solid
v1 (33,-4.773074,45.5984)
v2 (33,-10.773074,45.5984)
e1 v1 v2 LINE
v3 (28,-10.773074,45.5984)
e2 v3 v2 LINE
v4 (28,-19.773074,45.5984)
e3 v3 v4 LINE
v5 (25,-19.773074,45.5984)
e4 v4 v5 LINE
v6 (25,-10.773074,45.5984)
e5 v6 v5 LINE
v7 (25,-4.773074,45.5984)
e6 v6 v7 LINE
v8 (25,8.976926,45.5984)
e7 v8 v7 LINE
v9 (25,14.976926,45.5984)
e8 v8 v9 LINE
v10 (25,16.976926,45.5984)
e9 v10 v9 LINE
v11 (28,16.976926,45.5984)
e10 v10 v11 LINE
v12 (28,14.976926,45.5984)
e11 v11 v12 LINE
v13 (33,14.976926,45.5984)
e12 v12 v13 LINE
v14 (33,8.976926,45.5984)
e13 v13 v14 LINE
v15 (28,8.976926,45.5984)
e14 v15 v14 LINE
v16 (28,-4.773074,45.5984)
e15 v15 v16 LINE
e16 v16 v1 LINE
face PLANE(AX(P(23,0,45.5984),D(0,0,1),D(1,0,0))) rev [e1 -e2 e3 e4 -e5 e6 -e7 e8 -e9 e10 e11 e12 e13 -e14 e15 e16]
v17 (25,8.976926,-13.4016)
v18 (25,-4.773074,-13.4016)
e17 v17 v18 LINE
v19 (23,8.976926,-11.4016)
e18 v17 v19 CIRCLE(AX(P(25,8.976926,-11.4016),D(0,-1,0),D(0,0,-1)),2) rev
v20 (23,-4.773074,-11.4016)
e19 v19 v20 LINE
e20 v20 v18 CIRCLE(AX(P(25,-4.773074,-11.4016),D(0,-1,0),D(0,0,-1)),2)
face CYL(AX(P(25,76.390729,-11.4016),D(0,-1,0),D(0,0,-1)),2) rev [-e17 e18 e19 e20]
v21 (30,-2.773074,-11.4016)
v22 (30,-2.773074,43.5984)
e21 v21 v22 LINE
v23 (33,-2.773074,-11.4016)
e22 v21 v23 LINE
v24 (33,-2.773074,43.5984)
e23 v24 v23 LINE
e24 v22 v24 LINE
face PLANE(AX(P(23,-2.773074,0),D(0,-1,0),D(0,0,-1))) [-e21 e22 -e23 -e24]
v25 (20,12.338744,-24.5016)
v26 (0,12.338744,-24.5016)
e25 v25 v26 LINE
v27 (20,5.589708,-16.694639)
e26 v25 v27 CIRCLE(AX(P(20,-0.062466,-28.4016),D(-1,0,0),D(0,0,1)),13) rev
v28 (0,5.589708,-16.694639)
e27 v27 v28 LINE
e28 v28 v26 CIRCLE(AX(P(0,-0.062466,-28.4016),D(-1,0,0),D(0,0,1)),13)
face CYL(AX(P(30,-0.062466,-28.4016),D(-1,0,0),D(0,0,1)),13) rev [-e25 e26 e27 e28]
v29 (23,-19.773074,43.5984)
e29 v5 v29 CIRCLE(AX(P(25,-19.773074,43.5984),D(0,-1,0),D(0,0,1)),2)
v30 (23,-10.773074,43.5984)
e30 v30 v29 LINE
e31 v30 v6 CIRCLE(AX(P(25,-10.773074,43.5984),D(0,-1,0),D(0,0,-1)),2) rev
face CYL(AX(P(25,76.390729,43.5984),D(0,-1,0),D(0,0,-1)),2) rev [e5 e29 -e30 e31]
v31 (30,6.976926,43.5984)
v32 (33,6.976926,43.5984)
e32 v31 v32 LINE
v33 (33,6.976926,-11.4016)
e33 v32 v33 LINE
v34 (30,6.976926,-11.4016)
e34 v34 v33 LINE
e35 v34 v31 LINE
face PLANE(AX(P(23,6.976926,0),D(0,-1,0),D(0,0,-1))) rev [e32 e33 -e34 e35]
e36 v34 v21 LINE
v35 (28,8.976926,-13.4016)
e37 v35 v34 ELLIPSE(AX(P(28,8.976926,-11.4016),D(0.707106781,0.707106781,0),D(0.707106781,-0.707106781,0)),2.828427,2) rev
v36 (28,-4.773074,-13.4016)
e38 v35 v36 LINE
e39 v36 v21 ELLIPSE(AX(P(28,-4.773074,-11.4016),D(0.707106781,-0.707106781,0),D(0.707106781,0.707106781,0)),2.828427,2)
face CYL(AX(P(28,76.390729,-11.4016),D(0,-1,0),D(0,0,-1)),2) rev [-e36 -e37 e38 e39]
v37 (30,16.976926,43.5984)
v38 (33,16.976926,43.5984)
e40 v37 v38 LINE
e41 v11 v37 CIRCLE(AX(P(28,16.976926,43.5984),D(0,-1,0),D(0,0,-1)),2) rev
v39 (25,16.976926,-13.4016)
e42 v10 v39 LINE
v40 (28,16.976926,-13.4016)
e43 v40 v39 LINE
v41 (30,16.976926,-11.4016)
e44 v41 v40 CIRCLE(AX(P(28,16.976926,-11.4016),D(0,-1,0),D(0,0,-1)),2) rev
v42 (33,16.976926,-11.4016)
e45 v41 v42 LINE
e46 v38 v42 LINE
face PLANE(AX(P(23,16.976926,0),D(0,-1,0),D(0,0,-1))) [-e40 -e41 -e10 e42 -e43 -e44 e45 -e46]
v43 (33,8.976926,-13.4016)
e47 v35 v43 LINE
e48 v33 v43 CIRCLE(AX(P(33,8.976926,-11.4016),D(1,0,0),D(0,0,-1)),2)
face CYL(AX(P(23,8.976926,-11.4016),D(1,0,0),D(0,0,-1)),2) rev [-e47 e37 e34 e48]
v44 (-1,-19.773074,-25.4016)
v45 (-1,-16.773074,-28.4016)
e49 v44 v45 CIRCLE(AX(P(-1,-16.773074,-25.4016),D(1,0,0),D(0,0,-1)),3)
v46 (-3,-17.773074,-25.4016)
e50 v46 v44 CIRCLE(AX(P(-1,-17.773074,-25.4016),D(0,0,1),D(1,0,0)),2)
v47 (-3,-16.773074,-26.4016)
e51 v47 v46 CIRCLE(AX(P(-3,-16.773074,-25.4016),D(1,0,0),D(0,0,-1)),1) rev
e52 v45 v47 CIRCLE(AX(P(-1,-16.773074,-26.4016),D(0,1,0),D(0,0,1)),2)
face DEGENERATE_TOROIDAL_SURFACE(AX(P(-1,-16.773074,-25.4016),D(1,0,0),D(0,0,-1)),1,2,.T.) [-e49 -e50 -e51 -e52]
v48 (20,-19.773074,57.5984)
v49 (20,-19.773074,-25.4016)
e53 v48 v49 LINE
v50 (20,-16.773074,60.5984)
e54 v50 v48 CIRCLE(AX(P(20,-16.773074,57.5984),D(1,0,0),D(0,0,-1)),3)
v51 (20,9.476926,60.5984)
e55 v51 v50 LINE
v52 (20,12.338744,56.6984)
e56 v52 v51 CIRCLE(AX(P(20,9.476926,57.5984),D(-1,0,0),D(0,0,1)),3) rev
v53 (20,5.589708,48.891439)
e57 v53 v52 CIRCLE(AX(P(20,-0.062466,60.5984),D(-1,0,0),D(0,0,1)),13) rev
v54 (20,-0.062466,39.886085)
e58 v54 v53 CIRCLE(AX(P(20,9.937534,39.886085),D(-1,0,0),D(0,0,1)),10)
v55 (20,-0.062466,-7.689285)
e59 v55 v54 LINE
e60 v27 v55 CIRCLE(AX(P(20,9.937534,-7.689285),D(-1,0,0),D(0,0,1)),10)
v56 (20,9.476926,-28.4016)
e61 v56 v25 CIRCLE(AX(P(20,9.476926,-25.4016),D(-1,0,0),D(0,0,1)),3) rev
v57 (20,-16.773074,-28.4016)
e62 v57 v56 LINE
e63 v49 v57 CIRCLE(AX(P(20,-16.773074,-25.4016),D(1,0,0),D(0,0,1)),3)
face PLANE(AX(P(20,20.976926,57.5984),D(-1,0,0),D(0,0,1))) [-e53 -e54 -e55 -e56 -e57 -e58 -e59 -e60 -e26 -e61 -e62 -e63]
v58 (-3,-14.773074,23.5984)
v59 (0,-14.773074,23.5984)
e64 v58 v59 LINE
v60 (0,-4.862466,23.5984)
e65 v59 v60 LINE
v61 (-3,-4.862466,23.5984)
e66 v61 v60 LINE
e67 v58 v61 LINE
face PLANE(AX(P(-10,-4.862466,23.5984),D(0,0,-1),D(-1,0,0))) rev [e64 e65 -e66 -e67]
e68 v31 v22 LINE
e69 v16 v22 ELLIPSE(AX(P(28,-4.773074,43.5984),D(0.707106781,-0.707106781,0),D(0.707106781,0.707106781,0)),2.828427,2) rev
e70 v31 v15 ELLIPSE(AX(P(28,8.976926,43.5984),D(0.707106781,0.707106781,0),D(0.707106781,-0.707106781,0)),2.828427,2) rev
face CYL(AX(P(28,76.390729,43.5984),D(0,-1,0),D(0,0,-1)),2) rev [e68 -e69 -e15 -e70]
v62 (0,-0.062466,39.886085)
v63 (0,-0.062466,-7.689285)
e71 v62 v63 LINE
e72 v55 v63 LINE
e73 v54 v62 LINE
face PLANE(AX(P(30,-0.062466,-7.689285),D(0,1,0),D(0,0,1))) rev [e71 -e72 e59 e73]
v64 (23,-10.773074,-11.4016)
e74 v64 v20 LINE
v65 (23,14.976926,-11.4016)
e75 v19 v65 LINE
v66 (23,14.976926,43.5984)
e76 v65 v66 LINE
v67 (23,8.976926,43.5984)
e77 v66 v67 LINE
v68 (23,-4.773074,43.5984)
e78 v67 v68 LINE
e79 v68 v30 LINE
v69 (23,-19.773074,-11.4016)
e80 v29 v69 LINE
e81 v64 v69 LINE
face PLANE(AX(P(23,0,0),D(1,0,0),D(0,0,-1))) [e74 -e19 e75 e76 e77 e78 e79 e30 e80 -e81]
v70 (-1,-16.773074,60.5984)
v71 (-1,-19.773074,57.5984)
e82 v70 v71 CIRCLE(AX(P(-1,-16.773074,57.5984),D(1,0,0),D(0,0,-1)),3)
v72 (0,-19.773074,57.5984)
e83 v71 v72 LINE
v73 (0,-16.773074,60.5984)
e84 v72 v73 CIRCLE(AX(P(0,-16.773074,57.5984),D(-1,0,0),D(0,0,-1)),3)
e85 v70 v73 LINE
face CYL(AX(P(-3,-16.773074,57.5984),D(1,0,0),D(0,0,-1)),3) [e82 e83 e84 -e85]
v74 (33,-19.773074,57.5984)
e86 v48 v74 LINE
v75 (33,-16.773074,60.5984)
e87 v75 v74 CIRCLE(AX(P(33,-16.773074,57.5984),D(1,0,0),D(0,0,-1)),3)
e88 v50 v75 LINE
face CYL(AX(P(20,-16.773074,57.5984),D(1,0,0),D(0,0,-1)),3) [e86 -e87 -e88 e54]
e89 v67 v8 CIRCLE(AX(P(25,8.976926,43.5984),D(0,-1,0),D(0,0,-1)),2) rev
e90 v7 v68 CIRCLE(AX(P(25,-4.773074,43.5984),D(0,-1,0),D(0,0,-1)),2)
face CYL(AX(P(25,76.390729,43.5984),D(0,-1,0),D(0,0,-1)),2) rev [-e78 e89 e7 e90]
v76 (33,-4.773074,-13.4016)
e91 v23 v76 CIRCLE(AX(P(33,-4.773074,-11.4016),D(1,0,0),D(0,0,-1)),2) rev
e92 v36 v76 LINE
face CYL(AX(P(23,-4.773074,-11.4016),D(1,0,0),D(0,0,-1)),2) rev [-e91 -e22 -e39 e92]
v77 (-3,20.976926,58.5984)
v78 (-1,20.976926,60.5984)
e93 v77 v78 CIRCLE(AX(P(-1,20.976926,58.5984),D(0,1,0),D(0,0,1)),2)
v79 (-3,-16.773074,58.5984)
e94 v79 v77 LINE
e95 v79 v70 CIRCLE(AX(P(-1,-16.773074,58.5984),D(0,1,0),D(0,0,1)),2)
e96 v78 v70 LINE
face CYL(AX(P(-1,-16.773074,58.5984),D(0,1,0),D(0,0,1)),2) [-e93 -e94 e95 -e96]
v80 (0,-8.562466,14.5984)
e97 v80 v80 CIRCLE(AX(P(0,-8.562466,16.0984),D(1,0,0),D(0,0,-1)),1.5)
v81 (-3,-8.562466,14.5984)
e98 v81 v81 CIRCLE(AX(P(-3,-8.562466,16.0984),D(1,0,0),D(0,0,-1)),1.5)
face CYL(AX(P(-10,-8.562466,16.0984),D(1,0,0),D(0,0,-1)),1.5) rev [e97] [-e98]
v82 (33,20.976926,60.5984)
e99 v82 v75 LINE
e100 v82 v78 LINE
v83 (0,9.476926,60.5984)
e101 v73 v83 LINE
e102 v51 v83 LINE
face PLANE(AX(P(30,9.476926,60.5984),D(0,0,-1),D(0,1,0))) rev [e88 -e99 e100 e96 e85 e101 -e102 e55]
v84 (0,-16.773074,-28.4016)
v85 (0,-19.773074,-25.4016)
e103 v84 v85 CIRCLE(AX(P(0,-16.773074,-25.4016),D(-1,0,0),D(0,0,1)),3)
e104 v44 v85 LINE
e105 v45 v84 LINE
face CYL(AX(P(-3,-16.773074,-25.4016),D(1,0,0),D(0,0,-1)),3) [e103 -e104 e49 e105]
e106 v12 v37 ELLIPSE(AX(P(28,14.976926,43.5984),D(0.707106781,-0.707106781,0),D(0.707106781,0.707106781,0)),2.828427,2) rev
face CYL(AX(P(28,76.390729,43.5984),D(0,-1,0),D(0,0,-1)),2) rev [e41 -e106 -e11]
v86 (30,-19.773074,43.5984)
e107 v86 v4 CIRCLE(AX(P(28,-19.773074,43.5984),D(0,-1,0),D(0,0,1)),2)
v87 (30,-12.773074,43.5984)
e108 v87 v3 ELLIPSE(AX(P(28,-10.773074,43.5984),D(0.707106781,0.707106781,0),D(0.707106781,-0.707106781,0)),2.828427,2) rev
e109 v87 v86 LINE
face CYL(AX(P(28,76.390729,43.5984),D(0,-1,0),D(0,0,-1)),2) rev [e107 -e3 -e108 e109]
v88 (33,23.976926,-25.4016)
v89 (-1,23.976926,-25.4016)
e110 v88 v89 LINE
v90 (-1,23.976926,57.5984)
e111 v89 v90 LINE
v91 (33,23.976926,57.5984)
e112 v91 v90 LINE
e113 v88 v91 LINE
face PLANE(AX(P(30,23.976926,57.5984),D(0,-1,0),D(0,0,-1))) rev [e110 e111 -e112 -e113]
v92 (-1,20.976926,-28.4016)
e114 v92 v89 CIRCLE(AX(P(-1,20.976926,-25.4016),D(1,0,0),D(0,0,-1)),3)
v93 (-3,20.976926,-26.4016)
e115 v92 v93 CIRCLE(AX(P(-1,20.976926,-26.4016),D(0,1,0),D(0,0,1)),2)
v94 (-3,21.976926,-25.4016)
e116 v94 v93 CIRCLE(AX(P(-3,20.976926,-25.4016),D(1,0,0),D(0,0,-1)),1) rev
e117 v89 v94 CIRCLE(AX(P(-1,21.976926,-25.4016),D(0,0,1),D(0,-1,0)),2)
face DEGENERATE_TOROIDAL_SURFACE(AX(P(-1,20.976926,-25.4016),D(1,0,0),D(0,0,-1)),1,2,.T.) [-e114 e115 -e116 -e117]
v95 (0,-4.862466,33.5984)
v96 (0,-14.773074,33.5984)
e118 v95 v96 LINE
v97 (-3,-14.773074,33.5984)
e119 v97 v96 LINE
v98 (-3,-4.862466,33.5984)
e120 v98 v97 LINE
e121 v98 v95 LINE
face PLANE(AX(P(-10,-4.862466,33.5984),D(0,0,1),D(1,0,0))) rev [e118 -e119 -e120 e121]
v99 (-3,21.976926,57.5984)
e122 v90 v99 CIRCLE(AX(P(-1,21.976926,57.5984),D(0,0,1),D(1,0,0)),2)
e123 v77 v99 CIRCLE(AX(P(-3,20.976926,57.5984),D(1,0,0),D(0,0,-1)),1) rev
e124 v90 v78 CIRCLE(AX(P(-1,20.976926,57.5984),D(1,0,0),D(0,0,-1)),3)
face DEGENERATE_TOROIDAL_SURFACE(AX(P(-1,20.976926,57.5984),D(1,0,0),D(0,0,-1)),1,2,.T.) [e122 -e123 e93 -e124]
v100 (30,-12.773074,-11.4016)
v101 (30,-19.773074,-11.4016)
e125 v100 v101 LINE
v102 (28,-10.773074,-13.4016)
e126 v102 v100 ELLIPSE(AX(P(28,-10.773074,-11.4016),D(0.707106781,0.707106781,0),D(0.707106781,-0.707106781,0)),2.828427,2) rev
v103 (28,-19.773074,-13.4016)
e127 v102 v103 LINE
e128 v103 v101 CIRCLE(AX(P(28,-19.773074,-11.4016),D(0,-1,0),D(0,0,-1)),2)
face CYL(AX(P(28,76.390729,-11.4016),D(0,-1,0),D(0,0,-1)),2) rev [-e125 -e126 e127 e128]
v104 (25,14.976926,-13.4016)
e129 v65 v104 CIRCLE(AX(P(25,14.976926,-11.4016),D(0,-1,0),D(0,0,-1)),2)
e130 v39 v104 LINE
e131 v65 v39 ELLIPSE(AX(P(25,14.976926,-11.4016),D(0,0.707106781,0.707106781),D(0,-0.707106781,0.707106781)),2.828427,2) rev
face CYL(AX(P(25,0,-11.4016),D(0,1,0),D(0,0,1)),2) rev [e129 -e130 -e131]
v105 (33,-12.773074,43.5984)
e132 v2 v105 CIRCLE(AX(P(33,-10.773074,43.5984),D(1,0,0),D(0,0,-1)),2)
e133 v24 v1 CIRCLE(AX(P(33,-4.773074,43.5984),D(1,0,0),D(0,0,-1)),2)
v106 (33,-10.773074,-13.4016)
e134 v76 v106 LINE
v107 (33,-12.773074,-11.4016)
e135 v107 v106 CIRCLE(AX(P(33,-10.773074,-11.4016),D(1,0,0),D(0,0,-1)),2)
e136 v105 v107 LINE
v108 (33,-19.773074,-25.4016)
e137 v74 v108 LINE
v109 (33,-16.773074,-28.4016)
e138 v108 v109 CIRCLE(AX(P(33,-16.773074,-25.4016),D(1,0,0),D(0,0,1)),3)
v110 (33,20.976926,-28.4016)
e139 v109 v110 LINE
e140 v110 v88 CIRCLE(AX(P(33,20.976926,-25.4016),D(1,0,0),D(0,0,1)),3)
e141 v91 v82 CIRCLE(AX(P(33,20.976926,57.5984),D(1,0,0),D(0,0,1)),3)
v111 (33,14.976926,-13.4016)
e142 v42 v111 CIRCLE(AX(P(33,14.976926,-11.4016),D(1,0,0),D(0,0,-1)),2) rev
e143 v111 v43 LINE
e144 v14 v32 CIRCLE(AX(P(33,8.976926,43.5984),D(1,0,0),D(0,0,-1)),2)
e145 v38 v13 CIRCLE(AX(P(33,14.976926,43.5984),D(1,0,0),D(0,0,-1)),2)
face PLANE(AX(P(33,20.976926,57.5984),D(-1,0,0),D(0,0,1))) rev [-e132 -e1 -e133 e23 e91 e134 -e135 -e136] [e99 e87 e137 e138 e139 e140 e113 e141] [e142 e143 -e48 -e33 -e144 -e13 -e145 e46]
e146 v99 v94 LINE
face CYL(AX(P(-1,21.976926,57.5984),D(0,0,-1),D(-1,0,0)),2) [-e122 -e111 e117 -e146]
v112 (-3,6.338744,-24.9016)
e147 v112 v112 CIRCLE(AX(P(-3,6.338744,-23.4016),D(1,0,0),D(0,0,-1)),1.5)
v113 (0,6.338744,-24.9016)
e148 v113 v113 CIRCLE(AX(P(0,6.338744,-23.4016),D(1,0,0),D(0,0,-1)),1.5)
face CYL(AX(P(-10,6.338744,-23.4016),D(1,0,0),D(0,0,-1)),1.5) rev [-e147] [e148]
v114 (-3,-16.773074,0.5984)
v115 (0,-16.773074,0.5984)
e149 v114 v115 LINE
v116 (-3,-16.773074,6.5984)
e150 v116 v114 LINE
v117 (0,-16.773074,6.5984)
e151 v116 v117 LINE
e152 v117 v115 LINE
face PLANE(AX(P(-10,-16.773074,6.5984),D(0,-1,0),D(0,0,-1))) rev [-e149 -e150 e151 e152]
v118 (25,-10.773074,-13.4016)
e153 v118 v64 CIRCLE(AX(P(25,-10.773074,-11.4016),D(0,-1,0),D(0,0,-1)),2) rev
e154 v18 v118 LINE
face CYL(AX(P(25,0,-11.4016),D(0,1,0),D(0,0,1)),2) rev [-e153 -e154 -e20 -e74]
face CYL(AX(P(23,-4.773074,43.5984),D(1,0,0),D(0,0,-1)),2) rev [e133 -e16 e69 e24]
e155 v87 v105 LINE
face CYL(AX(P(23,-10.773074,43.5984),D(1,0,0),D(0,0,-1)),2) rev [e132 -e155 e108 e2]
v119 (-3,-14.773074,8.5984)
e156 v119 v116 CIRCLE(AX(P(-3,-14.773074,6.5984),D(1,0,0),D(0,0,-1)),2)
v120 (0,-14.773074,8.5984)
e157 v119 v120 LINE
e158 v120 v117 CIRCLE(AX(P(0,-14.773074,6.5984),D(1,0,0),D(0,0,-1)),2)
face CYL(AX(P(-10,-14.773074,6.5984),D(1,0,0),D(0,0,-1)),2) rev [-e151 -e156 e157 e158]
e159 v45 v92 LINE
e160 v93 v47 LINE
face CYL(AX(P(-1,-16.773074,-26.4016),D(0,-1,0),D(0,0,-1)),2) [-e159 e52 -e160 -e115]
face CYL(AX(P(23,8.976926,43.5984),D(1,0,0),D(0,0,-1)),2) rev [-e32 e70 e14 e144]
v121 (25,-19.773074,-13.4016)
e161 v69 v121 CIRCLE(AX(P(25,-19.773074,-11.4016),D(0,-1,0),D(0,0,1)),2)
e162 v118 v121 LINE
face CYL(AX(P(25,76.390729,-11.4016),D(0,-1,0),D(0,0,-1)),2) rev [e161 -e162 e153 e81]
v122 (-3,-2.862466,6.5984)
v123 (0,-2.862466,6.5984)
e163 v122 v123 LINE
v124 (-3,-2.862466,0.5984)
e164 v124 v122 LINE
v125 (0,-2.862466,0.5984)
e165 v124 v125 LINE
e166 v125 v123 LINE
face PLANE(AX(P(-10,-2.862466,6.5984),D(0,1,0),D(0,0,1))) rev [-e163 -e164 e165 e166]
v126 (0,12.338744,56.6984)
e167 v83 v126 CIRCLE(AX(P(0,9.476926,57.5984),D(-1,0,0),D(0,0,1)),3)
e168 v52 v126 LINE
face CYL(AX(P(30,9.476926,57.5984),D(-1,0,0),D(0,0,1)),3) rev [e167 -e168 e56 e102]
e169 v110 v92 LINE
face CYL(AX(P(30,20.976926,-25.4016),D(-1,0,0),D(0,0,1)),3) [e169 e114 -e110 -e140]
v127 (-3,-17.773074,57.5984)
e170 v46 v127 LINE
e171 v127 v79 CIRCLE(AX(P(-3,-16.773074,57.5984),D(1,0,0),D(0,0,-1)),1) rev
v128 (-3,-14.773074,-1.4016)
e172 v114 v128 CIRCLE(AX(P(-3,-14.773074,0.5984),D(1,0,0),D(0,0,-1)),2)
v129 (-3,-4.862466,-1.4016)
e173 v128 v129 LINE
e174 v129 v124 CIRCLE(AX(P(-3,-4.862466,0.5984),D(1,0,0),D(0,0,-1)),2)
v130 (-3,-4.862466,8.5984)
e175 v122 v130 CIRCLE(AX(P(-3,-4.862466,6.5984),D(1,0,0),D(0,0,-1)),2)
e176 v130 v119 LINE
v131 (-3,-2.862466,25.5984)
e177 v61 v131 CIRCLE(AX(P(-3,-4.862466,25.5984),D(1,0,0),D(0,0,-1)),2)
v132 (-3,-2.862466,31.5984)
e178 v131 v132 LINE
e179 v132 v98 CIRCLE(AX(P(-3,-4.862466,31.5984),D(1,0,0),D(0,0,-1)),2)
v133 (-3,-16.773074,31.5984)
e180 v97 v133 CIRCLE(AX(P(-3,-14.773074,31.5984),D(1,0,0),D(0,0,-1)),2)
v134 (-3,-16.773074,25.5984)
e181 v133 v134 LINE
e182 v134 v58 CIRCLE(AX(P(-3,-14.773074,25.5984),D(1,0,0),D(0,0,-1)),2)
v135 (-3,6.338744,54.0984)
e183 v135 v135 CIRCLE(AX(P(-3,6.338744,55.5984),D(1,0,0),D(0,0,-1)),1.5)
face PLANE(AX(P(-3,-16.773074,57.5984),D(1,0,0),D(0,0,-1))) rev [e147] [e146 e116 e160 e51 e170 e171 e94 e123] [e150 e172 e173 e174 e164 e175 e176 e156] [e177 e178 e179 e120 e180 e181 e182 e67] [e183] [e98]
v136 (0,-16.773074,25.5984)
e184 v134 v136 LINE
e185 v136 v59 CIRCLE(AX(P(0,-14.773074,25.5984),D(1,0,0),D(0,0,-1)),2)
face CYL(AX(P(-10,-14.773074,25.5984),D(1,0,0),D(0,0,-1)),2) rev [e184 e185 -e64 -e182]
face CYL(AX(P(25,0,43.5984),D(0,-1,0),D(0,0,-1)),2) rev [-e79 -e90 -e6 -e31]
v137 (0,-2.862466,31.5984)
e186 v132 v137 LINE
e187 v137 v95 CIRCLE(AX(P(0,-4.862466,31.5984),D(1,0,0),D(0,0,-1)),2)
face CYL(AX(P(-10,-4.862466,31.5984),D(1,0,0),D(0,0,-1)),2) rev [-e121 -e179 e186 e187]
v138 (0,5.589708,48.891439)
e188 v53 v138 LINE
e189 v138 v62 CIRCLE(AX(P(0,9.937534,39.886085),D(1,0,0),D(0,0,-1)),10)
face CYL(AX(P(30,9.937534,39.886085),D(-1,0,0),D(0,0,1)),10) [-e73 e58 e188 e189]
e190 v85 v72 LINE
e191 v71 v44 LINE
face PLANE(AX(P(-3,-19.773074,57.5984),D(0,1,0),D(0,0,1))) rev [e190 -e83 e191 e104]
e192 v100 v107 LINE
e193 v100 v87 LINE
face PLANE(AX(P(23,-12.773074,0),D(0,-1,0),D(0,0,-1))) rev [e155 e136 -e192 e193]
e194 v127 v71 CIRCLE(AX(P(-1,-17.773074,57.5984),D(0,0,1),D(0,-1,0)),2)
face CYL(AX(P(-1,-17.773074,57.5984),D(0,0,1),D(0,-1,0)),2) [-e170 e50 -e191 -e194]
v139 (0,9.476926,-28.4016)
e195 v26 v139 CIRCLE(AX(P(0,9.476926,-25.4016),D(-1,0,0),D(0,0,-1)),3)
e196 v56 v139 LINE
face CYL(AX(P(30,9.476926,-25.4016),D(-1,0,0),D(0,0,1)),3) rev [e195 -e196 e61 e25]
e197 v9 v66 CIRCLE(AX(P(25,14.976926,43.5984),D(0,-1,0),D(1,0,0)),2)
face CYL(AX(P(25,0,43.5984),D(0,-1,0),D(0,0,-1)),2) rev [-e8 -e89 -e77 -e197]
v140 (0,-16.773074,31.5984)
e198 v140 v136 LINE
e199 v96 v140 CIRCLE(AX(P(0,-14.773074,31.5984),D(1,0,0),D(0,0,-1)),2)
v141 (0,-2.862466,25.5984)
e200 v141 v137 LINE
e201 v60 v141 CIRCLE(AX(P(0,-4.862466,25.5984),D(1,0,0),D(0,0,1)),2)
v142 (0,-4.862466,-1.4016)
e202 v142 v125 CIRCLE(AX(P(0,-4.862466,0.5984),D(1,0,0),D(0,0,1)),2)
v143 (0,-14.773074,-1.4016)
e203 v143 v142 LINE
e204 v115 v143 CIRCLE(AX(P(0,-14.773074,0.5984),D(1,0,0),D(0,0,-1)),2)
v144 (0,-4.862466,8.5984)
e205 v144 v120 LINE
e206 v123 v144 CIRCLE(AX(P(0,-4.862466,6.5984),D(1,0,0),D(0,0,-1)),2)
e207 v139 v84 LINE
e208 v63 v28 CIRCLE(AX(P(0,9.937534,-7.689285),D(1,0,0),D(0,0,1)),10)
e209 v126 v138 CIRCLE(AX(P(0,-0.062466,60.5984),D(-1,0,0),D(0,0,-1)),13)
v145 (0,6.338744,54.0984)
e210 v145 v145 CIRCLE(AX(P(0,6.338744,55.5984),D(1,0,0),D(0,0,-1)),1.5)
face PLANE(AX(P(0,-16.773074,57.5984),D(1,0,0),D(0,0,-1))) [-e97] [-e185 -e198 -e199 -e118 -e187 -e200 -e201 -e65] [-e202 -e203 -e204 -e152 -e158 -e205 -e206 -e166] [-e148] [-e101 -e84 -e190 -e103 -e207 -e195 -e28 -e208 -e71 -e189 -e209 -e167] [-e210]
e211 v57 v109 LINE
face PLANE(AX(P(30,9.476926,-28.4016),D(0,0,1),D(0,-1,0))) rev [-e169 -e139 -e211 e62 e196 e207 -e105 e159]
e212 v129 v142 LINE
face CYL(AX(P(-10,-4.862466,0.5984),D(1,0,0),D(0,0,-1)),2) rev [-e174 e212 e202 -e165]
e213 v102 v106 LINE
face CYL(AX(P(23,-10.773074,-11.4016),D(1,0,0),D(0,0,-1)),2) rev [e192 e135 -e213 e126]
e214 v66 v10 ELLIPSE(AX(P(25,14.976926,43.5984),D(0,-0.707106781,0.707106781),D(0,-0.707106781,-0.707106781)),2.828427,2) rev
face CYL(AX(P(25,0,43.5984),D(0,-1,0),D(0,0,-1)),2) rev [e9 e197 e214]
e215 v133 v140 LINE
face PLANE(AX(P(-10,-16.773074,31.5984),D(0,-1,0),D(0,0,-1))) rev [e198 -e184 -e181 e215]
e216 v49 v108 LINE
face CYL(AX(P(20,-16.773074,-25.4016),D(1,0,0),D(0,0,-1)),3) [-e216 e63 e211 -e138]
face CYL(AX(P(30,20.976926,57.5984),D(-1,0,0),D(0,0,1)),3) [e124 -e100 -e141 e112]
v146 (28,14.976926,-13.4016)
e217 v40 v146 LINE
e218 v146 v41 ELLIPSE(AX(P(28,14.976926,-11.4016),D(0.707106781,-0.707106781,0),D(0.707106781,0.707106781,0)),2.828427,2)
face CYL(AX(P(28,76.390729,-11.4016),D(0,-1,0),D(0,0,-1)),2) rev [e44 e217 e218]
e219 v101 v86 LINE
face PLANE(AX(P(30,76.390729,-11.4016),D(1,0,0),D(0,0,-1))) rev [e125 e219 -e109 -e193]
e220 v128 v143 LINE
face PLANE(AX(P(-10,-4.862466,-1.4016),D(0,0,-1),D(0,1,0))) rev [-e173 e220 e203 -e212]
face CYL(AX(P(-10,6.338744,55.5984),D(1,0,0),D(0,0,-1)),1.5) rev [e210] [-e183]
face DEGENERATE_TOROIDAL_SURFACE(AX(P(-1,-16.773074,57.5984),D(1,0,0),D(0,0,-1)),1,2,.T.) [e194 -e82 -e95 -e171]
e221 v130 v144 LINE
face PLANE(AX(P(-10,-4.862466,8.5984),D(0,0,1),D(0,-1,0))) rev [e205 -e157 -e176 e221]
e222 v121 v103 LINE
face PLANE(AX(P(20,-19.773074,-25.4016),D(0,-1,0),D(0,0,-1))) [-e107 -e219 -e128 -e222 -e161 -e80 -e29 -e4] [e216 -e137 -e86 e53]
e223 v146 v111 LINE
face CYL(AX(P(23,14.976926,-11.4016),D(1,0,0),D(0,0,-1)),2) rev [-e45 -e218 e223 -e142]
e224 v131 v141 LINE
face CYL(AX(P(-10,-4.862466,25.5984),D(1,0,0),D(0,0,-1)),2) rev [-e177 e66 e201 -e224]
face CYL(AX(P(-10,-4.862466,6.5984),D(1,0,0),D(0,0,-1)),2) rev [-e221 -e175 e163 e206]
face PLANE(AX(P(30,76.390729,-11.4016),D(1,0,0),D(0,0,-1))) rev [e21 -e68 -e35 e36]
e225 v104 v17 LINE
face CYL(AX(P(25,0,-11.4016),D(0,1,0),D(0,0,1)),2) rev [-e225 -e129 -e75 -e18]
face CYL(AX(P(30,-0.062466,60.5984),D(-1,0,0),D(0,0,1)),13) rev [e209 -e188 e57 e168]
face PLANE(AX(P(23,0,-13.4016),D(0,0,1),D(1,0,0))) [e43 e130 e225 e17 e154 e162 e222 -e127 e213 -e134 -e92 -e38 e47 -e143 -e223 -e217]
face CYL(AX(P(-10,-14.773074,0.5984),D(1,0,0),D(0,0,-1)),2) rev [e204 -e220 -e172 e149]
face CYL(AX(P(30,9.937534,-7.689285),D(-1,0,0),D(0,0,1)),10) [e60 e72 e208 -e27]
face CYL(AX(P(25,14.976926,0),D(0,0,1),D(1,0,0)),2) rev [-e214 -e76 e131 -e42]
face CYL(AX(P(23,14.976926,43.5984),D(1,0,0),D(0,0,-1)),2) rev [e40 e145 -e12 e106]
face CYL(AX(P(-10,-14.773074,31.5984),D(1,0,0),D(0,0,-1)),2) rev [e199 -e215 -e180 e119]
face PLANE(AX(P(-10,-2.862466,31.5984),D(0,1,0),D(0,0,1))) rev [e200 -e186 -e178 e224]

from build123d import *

# Parameters (mm, degrees)
RESSALTO_EXTRUS_O2_DEPTH      = 30
RESSALTO_EXTRUS_O3_START      = 3
RESSALTO_EXTRUS_O3_DEPTH      = 3
RESSALTO_EXTRUS_O4_DEPTH      = 3
RESSALTO_EXTRUS_O4_DEPTH_BACK = 10
CORTE_EXTRUS_O1_DEPTH         = 10
CORTE_EXTRUS_O2_REACH         = 83.702
FILETE1_START                 = -19.773073923
FILETE1_DEPTH                 = 36.75
FILETE1_START_2               = -13.40159992
FILETE1_2_DEPTH               = 59
ESBO_O10_R                    = 1.5
CORTE_EXTRUS_O3_DEPTH         = 10
CORTE_EXTRUS_O4_DEPTH         = 10
FILETE2_R                     = 2


with BuildPart() as part:
    # Esboço2 → Ressalto-extrusão2 (new body)
    with BuildSketch(Plane(origin=(0, 0, 0), x_dir=(0, 0, -1), z_dir=(1, 0, 0))):
        with BuildLine():
            Line((2.90159992, -0.062465938), (-35.09840008, -0.062465938))
            Line((-35.09840008, -0.062465938), (-39.886084903, -0.062465938))
            ThreePointArc((-39.886084903, -0.062465938), (-45.202180234, 1.467638524), (-48.891439328, 5.589707975))
            ThreePointArc((-48.891439328, 5.589707975), (-52.096536948, 9.772081499), (-56.69840008, 12.338743681))
            ThreePointArc((-56.69840008, 12.338743681), (-59.373224015, 11.895603401), (-60.59840008, 9.476926077))
            Line((-60.59840008, 9.476926077), (-60.59840008, 20.976926077))
            ThreePointArc((-60.59840008, 20.976926077), (-59.719720424, 23.09824642), (-57.59840008, 23.976926077))
            Line((-57.59840008, 23.976926077), (25.40159992, 23.976926077))
            ThreePointArc((25.40159992, 23.976926077), (27.522920263, 23.09824642), (28.40159992, 20.976926077))
            Line((28.40159992, 20.976926077), (28.40159992, 9.476926077))
            ThreePointArc((28.40159992, 9.476926077), (27.176423855, 11.895603401), (24.50159992, 12.338743681))
            ThreePointArc((24.50159992, 12.338743681), (19.899736788, 9.772081499), (16.694639168, 5.589707975))
            ThreePointArc((16.694639168, 5.589707975), (13.005380073, 1.467638524), (7.689284743, -0.062465938))
            Line((7.689284743, -0.062465938), (2.90159992, -0.062465938))
        make_face()
    extrude(amount=RESSALTO_EXTRUS_O2_DEPTH)

    # Esboço3 → Ressalto-extrusão3 (add)
    with BuildSketch(Plane.ZY.offset(RESSALTO_EXTRUS_O3_START)):
        with BuildLine():
            Line((60.59840008, 15.226926077), (60.59840008, 20.976926077))
            ThreePointArc((60.59840008, 20.976926077), (59.719720424, 23.09824642), (57.59840008, 23.976926077))
            Line((57.59840008, 23.976926077), (16.09840008, 23.976926077))
            Line((16.09840008, 23.976926077), (-25.40159992, 23.976926077))
            ThreePointArc((-25.40159992, 23.976926077), (-27.522920263, 23.09824642), (-28.40159992, 20.976926077))
            Line((-28.40159992, 20.976926077), (-28.40159992, 15.226926077))
            Line((-28.40159992, 15.226926077), (-28.40159992, -16.773073923))
            ThreePointArc((-28.40159992, -16.773073923), (-27.522920263, -18.894394267), (-25.40159992, -19.773073923))
            Line((-25.40159992, -19.773073923), (57.59840008, -19.773073923))
            ThreePointArc((57.59840008, -19.773073923), (59.719720424, -18.894394267), (60.59840008, -16.773073923))
            Line((60.59840008, -16.773073923), (60.59840008, 15.226926077))
        make_face()
    extrude(amount=-RESSALTO_EXTRUS_O3_DEPTH)

    # Esboço4 → Ressalto-extrusão4 (add, two sides: drawn at the far end of the back side and taken through both)
    with BuildSketch(Plane(origin=(30, 0, 0), x_dir=(0, 0, -1), z_dir=(1, 0, 0)).offset(-RESSALTO_EXTRUS_O4_DEPTH_BACK)):
        with BuildLine():
            Line((-16.09840008, 23.976926077), (25.40159992, 23.976926077))
            ThreePointArc((25.40159992, 23.976926077), (27.522920263, 23.09824642), (28.40159992, 20.976926077))
            Line((28.40159992, 20.976926077), (28.40159992, 15.226926077))
            Line((28.40159992, 15.226926077), (28.40159992, -16.773073923))
            ThreePointArc((28.40159992, -16.773073923), (27.522920263, -18.894394267), (25.40159992, -19.773073923))
            Line((25.40159992, -19.773073923), (-57.59840008, -19.773073923))
            ThreePointArc((-57.59840008, -19.773073923), (-59.719720424, -18.894394267), (-60.59840008, -16.773073923))
            Line((-60.59840008, -16.773073923), (-60.59840008, 15.226926077))
            Line((-60.59840008, 15.226926077), (-60.59840008, 20.976926077))
            ThreePointArc((-60.59840008, 20.976926077), (-59.719720424, 23.09824642), (-57.59840008, 23.976926077))
            Line((-57.59840008, 23.976926077), (-16.09840008, 23.976926077))
        make_face()
    extrude(amount=RESSALTO_EXTRUS_O4_DEPTH + RESSALTO_EXTRUS_O4_DEPTH_BACK)

    # Esboço8 → Corte-extrusão1 (cut)
    with BuildSketch(Plane(origin=(33, 0, 0), x_dir=(0, 0, -1), z_dir=(1, 0, 0))):
        with BuildLine():
            Line((-43.59840008, -2.773073923), (11.40159992, -2.773073923))
            ThreePointArc((11.40159992, -2.773073923), (12.815813482, -3.358860361), (13.40159992, -4.773073923))
            Line((13.40159992, -4.773073923), (13.40159992, -10.773073923))
            ThreePointArc((13.40159992, -10.773073923), (12.815813482, -12.187287486), (11.40159992, -12.773073923))
            Line((11.40159992, -12.773073923), (-43.59840008, -12.773073923))
            ThreePointArc((-43.59840008, -12.773073923), (-45.012613643, -12.187287486), (-45.59840008, -10.773073923))
            Line((-45.59840008, -10.773073923), (-45.59840008, -4.773073923))
            ThreePointArc((-45.59840008, -4.773073923), (-45.012613643, -3.358860361), (-43.59840008, -2.773073923))
        make_face()
        with BuildLine():
            Line((-43.59840008, 6.976926077), (11.40159992, 6.976926077))
            ThreePointArc((11.40159992, 6.976926077), (12.815813482, 7.562712514), (13.40159992, 8.976926077))
            Line((13.40159992, 8.976926077), (13.40159992, 14.976926077))
            ThreePointArc((13.40159992, 14.976926077), (12.815813482, 16.391139639), (11.40159992, 16.976926077))
            Line((11.40159992, 16.976926077), (-43.59840008, 16.976926077))
            ThreePointArc((-43.59840008, 16.976926077), (-45.012613643, 16.391139639), (-45.59840008, 14.976926077))
            Line((-45.59840008, 14.976926077), (-45.59840008, 8.976926077))
            ThreePointArc((-45.59840008, 8.976926077), (-45.012613643, 7.562712514), (-43.59840008, 6.976926077))
        make_face()
    extrude(amount=-CORTE_EXTRUS_O1_DEPTH, mode=Mode.SUBTRACT)

    # Corte-extrusão2: up to this face of the body (flat: up to its plane)
    corte_extrus_o2_end = Plane(part.part.faces().sort_by_distance((28, 16.976926077, 16.09840008))[0])
    # Esboço9 → Corte-extrusão2 (cut, up to the picked face)
    with BuildSketch(Plane(origin=(0, -19.773073923, 0), x_dir=(-1, 0, 0), z_dir=(0, -1, 0)), mode=Mode.PRIVATE) as corte_extrus_o2_sk1:
        with BuildLine():
            Line((-25, 13.40159992), (-28, 13.40159992))
            ThreePointArc((-28, 13.40159992), (-29.414213562, 12.815813482), (-30, 11.40159992))
            Line((-30, 11.40159992), (-30, -43.59840008))
            ThreePointArc((-30, -43.59840008), (-29.414213562, -45.012613643), (-28, -45.59840008))
            Line((-28, -45.59840008), (-25, -45.59840008))
            ThreePointArc((-25, -45.59840008), (-23.585786438, -45.012613643), (-23, -43.59840008))
            Line((-23, -43.59840008), (-23, 11.40159992))
            ThreePointArc((-23, 11.40159992), (-23.585786438, 12.815813482), (-25, 13.40159992))
        make_face()
    corte_extrus_o2_tool1 = split(extrude(corte_extrus_o2_sk1.sketch, amount=-CORTE_EXTRUS_O2_REACH, mode=Mode.PRIVATE), bisect_by=corte_extrus_o2_end, keep=Keep.BOTH, mode=Mode.PRIVATE)
    add(corte_extrus_o2_tool1.solids().sort_by(Axis((26.5, -19.773074, 16.0984), (0, 1, 0)))[0], mode=Mode.SUBTRACT)

    # Filete1: read off the stored shape, not the designer's step
    # Filete1 outline → Filete1 (add)
    with BuildSketch(Plane(origin=(0, 0, 0), x_dir=(1, 0, 0), z_dir=(0, 1, 0)).offset(FILETE1_START)):
        with BuildLine():
            ThreePointArc((25, -45.59840008), (23.585786437, -45.012613642), (23, -43.59840008))
            Line((23, -43.59840008), (23, -45.59840008))
            Line((23, -45.59840008), (25, -45.59840008))
        make_face()
        with BuildLine():
            ThreePointArc((23, 11.40159992), (23.585786438, 12.815813482), (25, 13.40159992))
            Line((25, 13.40159992), (23, 13.40159992))
            Line((23, 13.40159992), (23, 11.40159992))
        make_face()
    extrude(amount=FILETE1_DEPTH)

    # Filete1 2 outline → Filete1 2 (add)
    with BuildSketch(Plane.XY.offset(FILETE1_START_2)):
        with BuildLine():
            ThreePointArc((23, 14.976926077), (23.585786438, 16.391139639), (25, 16.976926077))
            Line((25, 16.976926077), (23, 16.976926077))
            Line((23, 16.976926077), (23, 14.976926077))
        make_face()
    extrude(amount=FILETE1_2_DEPTH)

    # Esboço10 → Corte-extrusão3 (cut)
    with BuildSketch(Plane(origin=(0, 0, 0), x_dir=(0, 0, -1), z_dir=(1, 0, 0))):
        with Locations((-55.59840008, 6.338743681)):
            Circle(ESBO_O10_R)
        with Locations((23.40159992, 6.338743681)):
            Circle(ESBO_O10_R)
        with Locations((-16.09840008, -8.562465938)):
            Circle(ESBO_O10_R)
    extrude(amount=-CORTE_EXTRUS_O3_DEPTH, mode=Mode.SUBTRACT)

    # Esboço12 → Corte-extrusão4 (cut)
    with BuildSketch(Plane(origin=(0, 0, 0), x_dir=(0, 0, -1), z_dir=(1, 0, 0))):
        with BuildLine():
            Line((-31.59840008, -2.862465938), (-25.59840008, -2.862465938))
            ThreePointArc((-25.59840008, -2.862465938), (-24.184186518, -3.448252375), (-23.59840008, -4.862465938))
            Line((-23.59840008, -4.862465938), (-23.59840008, -14.773073923))
            ThreePointArc((-23.59840008, -14.773073923), (-24.184186518, -16.187287486), (-25.59840008, -16.773073923))
            Line((-25.59840008, -16.773073923), (-31.59840008, -16.773073923))
            ThreePointArc((-31.59840008, -16.773073923), (-33.012613643, -16.187287486), (-33.59840008, -14.773073923))
            Line((-33.59840008, -14.773073923), (-33.59840008, -4.862465938))
            ThreePointArc((-33.59840008, -4.862465938), (-33.012613643, -3.448252375), (-31.59840008, -2.862465938))
        make_face()
        with BuildLine():
            Line((-6.59840008, -2.862465938), (-0.59840008, -2.862465938))
            ThreePointArc((-0.59840008, -2.862465938), (0.815813482, -3.448252375), (1.40159992, -4.862465938))
            Line((1.40159992, -4.862465938), (1.40159992, -14.773073923))
            ThreePointArc((1.40159992, -14.773073923), (0.815813482, -16.187287486), (-0.59840008, -16.773073923))
            Line((-0.59840008, -16.773073923), (-6.59840008, -16.773073923))
            ThreePointArc((-6.59840008, -16.773073923), (-8.012613643, -16.187287486), (-8.59840008, -14.773073923))
            Line((-8.59840008, -14.773073923), (-8.59840008, -4.862465938))
            ThreePointArc((-8.59840008, -4.862465938), (-8.012613643, -3.448252375), (-6.59840008, -2.862465938))
        make_face()
    extrude(amount=-CORTE_EXTRUS_O4_DEPTH, mode=Mode.SUBTRACT)

    # Filete2
    filete2_edges = [part.edges().sort_by_distance(p)[0] for p in [
        (-3, 2.101926077, 60.59840008),
        (-3, 23.09824642, 59.719720424),
        (-3, 23.976926077, 16.09840008),
        (-3, 23.09824642, -27.522920263),
        (-3, 2.101926077, -28.40159992),
        (-3, -18.894394267, -27.522920263),
        (-3, -19.773073923, 16.09840008),
        (-3, -18.894394267, 59.719720424),
    ]]
    fillet(filete2_edges, radius=FILETE2_R)


solid = part.part
